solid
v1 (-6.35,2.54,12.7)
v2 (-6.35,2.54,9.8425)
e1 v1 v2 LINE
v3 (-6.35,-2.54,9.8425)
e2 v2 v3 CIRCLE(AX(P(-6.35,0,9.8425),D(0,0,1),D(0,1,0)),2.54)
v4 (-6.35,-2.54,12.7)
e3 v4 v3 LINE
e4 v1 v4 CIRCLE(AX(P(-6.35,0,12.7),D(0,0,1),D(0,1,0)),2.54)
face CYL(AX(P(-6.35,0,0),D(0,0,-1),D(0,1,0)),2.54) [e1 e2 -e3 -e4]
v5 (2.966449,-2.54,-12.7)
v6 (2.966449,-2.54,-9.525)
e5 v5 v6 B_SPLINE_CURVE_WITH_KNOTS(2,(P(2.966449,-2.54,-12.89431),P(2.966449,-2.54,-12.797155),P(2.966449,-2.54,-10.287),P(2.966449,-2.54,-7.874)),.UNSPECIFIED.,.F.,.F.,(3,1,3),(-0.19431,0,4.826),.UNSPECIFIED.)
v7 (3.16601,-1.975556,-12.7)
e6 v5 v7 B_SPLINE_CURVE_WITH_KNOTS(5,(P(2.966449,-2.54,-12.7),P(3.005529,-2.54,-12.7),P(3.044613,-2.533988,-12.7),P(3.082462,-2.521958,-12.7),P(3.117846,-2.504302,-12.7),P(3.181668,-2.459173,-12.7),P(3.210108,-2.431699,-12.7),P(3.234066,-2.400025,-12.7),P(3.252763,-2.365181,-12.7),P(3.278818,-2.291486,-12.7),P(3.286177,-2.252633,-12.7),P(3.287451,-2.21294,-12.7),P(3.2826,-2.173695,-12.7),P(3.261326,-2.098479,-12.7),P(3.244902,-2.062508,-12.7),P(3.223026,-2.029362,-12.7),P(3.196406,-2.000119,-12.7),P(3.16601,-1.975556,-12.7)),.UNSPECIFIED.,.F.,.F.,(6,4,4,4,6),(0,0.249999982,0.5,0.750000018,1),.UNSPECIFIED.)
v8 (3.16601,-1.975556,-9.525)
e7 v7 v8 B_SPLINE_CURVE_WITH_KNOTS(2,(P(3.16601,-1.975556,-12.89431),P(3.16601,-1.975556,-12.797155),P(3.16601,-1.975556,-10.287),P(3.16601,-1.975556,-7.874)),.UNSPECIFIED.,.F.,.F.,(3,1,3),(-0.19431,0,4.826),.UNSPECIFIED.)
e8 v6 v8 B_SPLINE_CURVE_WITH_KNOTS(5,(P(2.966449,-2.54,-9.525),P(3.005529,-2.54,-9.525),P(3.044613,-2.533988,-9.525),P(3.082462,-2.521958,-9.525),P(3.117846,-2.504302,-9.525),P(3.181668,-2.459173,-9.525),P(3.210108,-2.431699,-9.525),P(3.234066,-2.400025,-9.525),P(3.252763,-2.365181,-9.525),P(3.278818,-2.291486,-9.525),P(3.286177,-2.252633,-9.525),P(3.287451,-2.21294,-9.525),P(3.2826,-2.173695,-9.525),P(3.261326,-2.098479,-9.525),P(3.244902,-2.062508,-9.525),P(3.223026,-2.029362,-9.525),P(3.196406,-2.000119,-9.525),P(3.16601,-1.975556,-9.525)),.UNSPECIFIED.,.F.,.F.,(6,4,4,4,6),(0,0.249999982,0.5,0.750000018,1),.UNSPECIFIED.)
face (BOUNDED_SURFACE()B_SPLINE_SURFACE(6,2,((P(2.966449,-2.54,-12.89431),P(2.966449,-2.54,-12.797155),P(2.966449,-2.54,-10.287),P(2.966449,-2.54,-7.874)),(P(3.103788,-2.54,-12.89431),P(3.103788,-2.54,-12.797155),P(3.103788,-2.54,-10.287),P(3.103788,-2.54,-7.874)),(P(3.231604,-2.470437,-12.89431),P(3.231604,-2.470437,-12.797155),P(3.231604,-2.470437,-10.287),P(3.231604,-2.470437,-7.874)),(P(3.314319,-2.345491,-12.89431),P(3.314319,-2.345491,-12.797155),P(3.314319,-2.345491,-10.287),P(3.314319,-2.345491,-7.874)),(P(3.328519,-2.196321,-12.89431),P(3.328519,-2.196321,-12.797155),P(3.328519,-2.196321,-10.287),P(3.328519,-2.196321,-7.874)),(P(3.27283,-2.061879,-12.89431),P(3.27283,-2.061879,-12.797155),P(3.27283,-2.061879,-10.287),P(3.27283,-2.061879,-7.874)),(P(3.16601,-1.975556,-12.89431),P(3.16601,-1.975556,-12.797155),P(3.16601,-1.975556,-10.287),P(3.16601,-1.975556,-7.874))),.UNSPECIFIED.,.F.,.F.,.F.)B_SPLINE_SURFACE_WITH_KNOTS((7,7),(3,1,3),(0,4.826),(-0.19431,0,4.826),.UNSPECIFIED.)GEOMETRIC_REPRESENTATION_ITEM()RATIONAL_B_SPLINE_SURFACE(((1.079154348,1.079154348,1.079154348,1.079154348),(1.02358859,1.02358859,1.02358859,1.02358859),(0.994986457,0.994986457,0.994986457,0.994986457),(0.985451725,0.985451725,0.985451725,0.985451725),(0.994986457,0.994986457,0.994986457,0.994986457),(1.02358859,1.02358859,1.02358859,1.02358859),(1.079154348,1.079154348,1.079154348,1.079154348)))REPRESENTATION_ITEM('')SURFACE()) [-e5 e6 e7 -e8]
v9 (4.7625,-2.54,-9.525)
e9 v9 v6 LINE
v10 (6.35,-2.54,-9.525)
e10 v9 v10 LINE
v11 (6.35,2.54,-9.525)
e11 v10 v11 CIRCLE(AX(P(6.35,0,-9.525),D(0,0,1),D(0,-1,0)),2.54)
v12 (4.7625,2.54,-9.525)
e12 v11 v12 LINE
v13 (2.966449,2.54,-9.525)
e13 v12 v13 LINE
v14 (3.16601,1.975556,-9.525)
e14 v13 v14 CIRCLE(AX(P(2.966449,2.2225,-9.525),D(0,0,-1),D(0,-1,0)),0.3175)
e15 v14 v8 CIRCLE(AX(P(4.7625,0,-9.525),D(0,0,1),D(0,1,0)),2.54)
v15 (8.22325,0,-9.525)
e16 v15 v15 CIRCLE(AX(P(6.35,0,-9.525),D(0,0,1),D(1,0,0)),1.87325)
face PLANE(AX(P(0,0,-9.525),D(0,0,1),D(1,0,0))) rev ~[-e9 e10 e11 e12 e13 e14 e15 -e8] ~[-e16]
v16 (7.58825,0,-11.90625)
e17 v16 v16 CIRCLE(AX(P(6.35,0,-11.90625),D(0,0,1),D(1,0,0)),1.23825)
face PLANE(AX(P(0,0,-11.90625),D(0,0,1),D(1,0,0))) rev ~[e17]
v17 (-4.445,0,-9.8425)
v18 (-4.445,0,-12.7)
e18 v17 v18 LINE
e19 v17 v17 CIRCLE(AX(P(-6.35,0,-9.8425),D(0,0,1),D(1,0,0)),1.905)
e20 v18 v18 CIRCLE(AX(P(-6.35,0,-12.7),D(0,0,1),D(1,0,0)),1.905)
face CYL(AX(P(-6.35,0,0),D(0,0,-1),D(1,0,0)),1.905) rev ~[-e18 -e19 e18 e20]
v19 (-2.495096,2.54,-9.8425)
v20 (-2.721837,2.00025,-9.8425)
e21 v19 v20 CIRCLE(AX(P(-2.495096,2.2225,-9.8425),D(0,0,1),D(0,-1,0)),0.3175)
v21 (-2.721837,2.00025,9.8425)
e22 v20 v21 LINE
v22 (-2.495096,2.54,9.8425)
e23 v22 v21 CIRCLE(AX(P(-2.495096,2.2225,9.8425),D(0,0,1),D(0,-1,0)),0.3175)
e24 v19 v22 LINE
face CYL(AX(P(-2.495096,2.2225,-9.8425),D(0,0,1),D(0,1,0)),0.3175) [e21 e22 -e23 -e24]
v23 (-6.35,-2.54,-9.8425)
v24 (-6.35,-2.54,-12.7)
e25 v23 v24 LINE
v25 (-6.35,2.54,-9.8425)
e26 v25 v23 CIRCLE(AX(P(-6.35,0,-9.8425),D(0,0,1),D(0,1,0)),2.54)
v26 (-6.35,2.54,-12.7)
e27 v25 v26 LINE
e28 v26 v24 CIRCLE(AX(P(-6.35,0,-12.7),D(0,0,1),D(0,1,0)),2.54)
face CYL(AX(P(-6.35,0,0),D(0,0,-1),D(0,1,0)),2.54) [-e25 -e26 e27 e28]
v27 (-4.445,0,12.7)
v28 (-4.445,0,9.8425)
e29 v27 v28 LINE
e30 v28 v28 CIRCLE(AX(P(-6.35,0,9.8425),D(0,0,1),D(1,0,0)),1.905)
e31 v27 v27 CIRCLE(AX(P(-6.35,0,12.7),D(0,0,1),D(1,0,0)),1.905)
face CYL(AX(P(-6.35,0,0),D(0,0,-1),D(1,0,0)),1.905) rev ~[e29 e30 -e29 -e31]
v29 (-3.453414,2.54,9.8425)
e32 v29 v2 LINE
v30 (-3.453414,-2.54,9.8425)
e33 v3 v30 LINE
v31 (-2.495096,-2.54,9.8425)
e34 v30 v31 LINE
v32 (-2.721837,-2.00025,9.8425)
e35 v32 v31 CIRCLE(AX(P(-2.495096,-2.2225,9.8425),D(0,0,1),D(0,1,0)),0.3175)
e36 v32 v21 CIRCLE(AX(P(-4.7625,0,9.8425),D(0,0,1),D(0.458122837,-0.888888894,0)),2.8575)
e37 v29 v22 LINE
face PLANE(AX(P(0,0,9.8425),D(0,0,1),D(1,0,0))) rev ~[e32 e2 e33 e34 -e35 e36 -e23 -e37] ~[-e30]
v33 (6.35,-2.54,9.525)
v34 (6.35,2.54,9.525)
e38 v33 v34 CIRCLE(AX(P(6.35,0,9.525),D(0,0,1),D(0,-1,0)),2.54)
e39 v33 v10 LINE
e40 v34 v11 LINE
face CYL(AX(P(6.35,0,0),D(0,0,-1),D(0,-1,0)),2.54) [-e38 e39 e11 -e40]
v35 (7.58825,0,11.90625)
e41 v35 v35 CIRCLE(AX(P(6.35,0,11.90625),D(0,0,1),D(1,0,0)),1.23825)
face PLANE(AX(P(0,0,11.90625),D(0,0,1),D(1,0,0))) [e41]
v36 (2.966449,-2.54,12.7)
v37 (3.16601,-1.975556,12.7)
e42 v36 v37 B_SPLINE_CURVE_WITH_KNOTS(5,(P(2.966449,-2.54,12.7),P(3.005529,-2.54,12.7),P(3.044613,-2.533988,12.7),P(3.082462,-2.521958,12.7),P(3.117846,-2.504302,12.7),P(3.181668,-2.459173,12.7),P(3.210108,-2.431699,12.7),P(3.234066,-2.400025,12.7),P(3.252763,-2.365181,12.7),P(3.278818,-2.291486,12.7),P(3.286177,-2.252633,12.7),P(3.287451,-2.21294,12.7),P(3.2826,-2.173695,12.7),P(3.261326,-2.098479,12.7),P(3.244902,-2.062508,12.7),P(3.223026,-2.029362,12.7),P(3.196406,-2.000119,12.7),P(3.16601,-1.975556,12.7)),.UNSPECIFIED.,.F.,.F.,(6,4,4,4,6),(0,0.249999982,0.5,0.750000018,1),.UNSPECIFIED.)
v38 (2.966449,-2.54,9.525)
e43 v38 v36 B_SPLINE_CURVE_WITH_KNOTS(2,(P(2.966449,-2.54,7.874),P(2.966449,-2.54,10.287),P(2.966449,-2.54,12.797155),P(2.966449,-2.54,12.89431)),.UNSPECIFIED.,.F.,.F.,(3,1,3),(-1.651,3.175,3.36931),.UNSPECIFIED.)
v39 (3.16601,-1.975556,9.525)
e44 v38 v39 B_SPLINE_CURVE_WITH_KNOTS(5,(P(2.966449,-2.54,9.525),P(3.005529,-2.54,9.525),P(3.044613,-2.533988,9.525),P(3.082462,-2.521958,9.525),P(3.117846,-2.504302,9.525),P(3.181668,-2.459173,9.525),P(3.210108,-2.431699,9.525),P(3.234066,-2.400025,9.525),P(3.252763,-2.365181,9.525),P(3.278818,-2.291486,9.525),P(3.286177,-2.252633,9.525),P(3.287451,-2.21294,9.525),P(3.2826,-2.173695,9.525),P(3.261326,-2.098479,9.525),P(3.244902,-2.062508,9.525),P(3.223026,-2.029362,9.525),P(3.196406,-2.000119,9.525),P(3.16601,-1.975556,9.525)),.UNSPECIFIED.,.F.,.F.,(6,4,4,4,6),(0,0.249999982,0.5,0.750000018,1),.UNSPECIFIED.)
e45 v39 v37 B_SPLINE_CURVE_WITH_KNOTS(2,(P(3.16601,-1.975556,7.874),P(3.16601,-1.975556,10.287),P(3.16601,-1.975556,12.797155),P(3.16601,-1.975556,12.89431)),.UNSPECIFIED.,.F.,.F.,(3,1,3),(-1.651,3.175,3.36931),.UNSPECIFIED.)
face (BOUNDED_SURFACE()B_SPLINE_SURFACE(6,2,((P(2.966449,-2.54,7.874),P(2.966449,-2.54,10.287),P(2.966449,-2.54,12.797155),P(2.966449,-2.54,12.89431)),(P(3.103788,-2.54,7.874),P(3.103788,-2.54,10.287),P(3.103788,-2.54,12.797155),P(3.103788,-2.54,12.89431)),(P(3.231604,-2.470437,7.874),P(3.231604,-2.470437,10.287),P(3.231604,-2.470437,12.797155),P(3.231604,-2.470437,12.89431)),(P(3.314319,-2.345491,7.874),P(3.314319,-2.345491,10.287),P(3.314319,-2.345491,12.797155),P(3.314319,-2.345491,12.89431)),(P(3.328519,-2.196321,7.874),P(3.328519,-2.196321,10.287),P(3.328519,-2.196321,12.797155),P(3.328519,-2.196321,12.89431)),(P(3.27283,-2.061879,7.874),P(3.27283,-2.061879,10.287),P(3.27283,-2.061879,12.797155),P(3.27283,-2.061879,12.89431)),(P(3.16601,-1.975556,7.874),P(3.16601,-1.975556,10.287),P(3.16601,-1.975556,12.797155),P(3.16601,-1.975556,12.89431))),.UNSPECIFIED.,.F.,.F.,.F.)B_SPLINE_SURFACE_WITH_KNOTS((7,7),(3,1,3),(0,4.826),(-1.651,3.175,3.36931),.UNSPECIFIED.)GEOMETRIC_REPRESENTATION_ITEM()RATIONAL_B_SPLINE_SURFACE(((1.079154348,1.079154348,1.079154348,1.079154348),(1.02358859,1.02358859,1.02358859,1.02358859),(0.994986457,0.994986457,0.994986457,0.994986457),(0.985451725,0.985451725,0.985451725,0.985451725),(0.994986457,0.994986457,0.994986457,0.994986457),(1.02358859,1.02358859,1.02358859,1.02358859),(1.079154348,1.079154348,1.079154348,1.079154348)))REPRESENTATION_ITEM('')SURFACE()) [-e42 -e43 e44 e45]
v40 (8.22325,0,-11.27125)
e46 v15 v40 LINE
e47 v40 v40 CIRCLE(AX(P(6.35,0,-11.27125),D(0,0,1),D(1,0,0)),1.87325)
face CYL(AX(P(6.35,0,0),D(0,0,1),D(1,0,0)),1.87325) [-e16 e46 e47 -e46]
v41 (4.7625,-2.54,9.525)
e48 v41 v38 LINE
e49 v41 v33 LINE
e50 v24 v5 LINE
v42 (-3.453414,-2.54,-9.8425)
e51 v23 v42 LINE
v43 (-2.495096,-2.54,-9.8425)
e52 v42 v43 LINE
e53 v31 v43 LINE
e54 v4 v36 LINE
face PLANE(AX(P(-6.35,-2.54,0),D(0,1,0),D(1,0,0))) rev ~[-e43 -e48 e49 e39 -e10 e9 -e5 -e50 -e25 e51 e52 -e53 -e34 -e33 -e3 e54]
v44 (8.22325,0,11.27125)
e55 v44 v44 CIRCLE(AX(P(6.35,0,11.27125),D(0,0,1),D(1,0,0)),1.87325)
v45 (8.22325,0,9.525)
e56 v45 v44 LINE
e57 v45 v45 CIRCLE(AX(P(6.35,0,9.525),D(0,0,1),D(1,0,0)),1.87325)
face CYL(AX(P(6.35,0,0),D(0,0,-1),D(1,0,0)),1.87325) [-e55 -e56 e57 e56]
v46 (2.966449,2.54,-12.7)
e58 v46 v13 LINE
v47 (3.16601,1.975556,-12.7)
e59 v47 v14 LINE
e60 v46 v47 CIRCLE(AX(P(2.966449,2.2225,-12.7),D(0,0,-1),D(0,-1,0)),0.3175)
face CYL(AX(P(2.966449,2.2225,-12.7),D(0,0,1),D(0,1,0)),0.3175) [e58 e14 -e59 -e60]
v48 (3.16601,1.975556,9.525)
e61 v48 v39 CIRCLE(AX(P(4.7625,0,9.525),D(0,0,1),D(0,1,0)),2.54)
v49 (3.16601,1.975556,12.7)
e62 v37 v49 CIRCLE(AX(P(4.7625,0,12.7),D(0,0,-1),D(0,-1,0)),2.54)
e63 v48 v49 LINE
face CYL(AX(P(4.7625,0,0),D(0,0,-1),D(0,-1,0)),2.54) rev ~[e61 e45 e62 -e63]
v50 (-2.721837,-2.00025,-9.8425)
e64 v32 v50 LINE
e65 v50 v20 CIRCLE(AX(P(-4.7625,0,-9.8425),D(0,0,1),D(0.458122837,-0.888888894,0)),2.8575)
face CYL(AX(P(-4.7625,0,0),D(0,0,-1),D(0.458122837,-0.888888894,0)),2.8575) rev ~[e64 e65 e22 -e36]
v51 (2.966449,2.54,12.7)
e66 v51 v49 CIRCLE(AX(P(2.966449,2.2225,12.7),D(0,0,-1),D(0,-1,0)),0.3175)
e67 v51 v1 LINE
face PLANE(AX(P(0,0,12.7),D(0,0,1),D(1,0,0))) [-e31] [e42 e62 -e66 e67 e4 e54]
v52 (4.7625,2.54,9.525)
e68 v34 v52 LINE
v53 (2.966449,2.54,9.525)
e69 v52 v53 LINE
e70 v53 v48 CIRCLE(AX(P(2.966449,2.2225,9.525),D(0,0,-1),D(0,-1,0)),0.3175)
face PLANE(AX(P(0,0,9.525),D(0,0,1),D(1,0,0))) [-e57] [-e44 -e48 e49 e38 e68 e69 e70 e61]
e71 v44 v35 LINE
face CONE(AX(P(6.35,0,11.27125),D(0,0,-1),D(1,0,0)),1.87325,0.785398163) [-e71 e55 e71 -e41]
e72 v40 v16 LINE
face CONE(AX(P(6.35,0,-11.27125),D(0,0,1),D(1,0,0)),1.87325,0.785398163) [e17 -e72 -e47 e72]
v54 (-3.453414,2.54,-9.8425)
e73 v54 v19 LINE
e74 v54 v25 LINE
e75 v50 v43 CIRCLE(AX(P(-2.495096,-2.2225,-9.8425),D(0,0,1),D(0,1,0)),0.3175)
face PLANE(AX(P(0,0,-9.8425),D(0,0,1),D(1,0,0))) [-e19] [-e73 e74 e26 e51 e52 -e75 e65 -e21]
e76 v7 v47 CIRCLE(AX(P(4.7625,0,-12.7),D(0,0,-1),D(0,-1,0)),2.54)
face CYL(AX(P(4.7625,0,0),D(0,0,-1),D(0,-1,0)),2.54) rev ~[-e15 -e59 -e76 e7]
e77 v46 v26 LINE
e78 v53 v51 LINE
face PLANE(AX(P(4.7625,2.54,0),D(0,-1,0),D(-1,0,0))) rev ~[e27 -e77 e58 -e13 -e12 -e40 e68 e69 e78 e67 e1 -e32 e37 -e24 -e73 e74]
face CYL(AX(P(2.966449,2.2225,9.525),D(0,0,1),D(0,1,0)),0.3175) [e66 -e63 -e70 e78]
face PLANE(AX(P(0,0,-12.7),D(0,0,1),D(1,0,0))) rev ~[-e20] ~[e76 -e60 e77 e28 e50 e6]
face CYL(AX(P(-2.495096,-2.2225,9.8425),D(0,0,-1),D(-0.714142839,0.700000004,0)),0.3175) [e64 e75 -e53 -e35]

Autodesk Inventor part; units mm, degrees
ref_plane "YZ Plane" through (0, 0, 0) normal (1, 0, 0) x (0, 1, 0)
ref_plane "XZ Plane" through (0, 0, 0) normal (0, 1, 0) x (-1, 0, 0)
ref_plane "XY Plane" through (0, 0, 0) normal (0, 0, 1) x (1, 0, 0)
sketch "Sketch1" plane through (0, 0, 0) normal (0, 0, 1) x (1, 0, 0)
  circle A0 centre (-6.35, 0) radius 1.905
  circle A1 centre (6.35, 0) radius 1.87325
  arc A2 (-6.35, 2.54) -> (-6.35, -2.54) centre (-6.35, 0) ccw
  line L0 (-6.35, 2.54) -> (4.7625, 2.54)
  line L1 (0, 3.556) -> (0, -3.556) construction
  line L2 (-12.446, 0) -> (12.446, 0) construction
  line L3 (-6.35, -2.54) -> (4.7625, -2.54)
  arc A3 (-3.453414, -2.54) -> (-3.453414, 2.54) centre (-4.7625, 0) ccw
  arc A4 (6.35, -2.54) -> (6.35, 2.54) centre (6.35, 0) ccw
  line L4 (4.7625, 2.54) -> (6.35, 2.54)
  line L5 (4.7625, -2.54) -> (6.35, -2.54)
  arc A5 (4.7625, 2.54) -> (4.7625, -2.54) centre (4.7625, 0) ccw
  dimension "d2" = 3.81
  dimension "d3" = 3.7465
  dimension "d5" = 5.08
  dimension "d6" = 12.7
  dimension "d16" = 1.5875
  dimension "d17" = 2.8575
  dimension "d18" = 1.5875
sketch "Sketch1 outline for Extrusion1" plane through (0, 0, 0) normal (0, 0, 1) x (1, 0, 0)
  arc A0 (4.7625, -2.54) -> (4.7625, 2.54) centre (4.7625, 0) cw
  line L0 (4.7625, 2.54) -> (-6.35, 2.54)
  arc A1 (-6.35, 2.54) -> (-6.35, -2.54) centre (-6.35, 0) ccw
  line L1 (-6.35, -2.54) -> (4.7625, -2.54)
  circle A2 centre (-6.35, 0) radius 1.905
extrude "Extrusion1" add sketch "Sketch1 outline for Extrusion1" along normal mid plane 25.4
sketch "Sketch1 outline for Extrusion2" plane through (0, 0, 0) normal (0, 0, 1) x (1, 0, 0)
  arc A0 (4.7625, 2.54) -> (4.7625, -2.54) centre (4.7625, 0) ccw
  line L0 (6.35, 2.54) -> (4.7625, 2.54)
  line L1 (4.7625, -2.54) -> (6.35, -2.54)
  arc A1 (6.35, -2.54) -> (6.35, 2.54) centre (6.35, 0) ccw
  circle A2 centre (6.35, 0) radius 1.87325
extrude "Extrusion2" add sketch "Sketch1 outline for Extrusion2" along normal mid plane 19.05
sketch "Sketch1 outline for Extrusion3" plane through (0, 0, 0) normal (0, 0, 1) x (1, 0, 0)
  line L0 (-3.453414, 2.54) -> (-6.35, 2.54)
  arc A0 (-3.453414, -2.54) -> (-3.453414, 2.54) centre (-4.7625, 0) ccw
  arc A1 (-6.35, 2.54) -> (-6.35, -2.54) centre (-6.35, 0) ccw
  line L1 (-6.35, -2.54) -> (-3.453414, -2.54)
  circle A2 centre (-6.35, 0) radius 1.905
extrude "Extrusion3" cut sketch "Sketch1 outline for Extrusion3" along normal mid plane 19.685
sketch "Sketch1 outline for Extrusion4" plane through (0, 0, 0) normal (0, 0, 1) x (1, 0, 0)
  circle A0 centre (6.35, 0) radius 1.87325
extrude "Extrusion4" add sketch "Sketch1 outline for Extrusion4" along normal mid plane 23.8125
chamfer "Chamfer1" distance 0.635 angle 45 2 edges at (4.4768, 0, 11.9062) (4.4768, 0, -11.9062)
fillet "Fillet1" radius 0.3175 6 edges at (-3.4534, 2.54, 0) (-3.4534, -2.54, 0) (4.7625, 2.54, 11.1125) (4.7625, 2.54, -11.1125) (4.7625, -2.54, 11.1125) (4.7625, -2.54, -11.1125)
equation "\"d18\" = d16"
properties part number "TrackDisplayStrapSegment"
